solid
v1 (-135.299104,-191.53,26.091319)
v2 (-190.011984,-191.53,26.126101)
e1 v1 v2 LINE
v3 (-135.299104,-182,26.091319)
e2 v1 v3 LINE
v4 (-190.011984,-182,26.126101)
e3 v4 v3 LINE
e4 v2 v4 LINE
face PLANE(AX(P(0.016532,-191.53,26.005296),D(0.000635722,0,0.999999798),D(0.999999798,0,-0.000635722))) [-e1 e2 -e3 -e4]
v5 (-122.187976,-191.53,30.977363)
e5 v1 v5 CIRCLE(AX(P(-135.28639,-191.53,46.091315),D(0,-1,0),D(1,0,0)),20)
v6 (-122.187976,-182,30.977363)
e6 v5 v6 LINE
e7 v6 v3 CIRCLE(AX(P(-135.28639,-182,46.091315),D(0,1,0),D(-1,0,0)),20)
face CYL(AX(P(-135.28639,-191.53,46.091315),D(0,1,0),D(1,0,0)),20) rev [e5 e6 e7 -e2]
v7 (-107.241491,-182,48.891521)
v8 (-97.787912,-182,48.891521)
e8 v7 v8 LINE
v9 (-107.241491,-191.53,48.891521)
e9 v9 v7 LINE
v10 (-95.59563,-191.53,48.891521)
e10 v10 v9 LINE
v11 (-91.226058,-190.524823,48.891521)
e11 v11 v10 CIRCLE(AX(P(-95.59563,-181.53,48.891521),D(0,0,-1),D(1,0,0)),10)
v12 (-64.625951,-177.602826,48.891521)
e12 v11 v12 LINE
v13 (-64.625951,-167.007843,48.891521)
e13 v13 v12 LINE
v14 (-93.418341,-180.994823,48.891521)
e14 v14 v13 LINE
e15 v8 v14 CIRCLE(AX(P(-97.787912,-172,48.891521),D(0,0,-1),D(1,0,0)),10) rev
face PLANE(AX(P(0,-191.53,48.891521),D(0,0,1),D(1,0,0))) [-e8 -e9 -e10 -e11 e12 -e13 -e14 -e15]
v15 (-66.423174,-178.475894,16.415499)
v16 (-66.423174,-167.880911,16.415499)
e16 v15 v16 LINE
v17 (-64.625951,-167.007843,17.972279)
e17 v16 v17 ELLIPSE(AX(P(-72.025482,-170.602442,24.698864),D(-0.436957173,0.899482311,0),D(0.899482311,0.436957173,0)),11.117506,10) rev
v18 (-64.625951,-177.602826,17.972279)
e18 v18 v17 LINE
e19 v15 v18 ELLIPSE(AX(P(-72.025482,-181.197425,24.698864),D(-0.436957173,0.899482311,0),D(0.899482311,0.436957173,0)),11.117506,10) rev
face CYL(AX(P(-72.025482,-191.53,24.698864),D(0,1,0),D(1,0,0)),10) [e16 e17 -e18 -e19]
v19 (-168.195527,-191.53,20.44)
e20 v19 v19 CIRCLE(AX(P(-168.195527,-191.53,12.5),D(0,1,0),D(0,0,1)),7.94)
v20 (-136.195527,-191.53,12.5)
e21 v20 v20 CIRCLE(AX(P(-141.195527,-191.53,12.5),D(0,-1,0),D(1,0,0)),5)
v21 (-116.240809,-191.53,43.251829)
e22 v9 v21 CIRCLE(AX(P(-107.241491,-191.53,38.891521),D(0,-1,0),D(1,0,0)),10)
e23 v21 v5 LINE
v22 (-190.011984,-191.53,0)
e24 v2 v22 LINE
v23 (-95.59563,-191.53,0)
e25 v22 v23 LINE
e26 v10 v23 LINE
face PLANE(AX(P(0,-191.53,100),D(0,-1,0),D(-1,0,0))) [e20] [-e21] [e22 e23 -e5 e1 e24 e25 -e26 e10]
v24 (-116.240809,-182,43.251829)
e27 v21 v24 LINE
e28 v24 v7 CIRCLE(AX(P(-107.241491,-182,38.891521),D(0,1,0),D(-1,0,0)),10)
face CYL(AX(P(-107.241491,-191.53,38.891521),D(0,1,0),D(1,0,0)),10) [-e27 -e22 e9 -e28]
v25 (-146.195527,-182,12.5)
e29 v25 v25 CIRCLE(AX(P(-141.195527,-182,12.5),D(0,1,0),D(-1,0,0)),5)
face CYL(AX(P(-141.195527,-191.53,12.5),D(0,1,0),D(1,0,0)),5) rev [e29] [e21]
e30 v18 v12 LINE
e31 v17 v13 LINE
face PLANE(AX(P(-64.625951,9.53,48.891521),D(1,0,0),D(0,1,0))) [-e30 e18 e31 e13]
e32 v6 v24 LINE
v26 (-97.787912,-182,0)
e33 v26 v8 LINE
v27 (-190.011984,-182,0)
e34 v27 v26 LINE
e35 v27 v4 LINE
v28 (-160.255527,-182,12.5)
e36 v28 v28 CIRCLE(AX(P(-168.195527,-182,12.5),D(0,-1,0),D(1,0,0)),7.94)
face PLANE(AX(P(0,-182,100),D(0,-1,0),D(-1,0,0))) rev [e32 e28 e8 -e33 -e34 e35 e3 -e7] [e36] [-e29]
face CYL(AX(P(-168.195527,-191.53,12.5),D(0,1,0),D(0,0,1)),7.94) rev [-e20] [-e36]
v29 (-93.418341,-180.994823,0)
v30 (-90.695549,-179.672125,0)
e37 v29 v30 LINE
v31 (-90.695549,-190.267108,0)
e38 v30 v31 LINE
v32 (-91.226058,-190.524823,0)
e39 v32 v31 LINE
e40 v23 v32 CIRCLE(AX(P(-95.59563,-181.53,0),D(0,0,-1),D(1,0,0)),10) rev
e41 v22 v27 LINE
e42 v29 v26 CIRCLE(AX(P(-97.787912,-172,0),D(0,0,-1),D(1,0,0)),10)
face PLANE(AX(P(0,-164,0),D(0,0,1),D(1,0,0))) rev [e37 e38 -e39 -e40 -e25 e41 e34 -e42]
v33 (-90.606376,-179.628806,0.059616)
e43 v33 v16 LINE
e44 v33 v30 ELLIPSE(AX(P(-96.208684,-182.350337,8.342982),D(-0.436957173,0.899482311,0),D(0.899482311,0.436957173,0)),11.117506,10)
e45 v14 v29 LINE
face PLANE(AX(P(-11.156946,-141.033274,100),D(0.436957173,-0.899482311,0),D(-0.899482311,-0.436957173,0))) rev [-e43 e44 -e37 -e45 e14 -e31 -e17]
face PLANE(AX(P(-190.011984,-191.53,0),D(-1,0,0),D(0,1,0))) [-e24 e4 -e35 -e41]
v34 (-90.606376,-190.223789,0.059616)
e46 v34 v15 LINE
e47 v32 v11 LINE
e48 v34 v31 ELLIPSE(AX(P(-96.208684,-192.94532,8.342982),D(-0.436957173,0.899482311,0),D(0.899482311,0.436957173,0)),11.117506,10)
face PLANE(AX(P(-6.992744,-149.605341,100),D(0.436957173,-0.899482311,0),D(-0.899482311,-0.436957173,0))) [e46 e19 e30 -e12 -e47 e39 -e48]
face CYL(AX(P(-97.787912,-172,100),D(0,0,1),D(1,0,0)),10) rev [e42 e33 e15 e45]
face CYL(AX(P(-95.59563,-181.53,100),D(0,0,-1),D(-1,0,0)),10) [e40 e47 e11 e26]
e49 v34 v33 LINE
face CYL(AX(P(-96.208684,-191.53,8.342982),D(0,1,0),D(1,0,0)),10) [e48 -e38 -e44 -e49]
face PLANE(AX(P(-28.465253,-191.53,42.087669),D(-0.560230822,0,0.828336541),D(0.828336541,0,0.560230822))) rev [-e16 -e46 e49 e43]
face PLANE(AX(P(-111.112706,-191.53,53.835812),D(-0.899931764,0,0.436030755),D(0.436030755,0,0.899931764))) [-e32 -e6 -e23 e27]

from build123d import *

# Parameters (mm, degrees)
SALIENTE_EXTRUIR1_DEPTH    = 100
CORTAR_EXTRUIR3_START      = -9.53
CORTAR_EXTRUIR3_DEPTH      = 27.53
CORTAR_EXTRUIR4_DEPTH      = 217.130875219
CORTAR_EXTRUIR4_DEPTH_BACK = 217.130875219
CROQUIS5_R                 = 6
CORTAR_EXTRUIR5_DEPTH      = 216.124741308
CORTAR_EXTRUIR5_DEPTH_BACK = 216.124741308
CROQUIS6_R                 = 5
SALIENTE_EXTRUIR5_START    = 15.13
CROQUIS12_R                = 8
CROQUIS12_R_2              = 6
SALIENTE_EXTRUIR5_DEPTH    = 15.13
CROQUIS14_R                = 10
CROQUIS14_R_2              = 6
SALIENTE_EXTRUIR6_DEPTH    = 14.13
REDONDEO1_R                = 10
CROQUIS15_R                = 129.913958972
CORTAR_EXTRUIR6_DEPTH      = 241.731126452
CORTAR_EXTRUIR7_DEPTH      = 241.731126452
CORTAR_EXTRUIR7_DEPTH_BACK = 241.731126452
CROQUIS16_R                = 167.818918699
CROQUIS16_W                = 152.833455663
CROQUIS16_H                = 57.32474986
CROQUIS17_R                = 7.94
CORTAR_EXTRUIR8_DEPTH      = 275.18730081


# Read off the part's stored shape, not the designer's step: Cortar-Extruir3
with BuildPart() as part:
    # Croquis1 → Saliente-Extruir1 (new body)
    with BuildSketch(Plane(origin=(0, 0, 0), x_dir=(-1, 0, 0), z_dir=(0, 0, 1))):
        Polygon((197, -18), (95.487511072, -18), (58.434265153, 0), (0, 0), (0, -9.53), (56.241982635, -9.53), (93.295228555, -27.53), (197, -27.53), align=None)
    extrude(amount=SALIENTE_EXTRUIR1_DEPTH)

    # Cortar-Extruir3 outline → Cortar-Extruir3 (cut)
    with BuildSketch(Plane.XZ.offset(-18).offset(CORTAR_EXTRUIR3_START)):
        with BuildLine():
            ThreePointArc((-55.249840127, 84.500440573), (-26.332291795, 96.782267833), (-21.152892526, 65.794500802))
            Line((-21.152892526, 65.794500802), (-64.625951049, 17.972279409))
            ThreePointArc((-64.625951049, 17.972279409), (-65.478127712, 17.140282818), (-66.423173576, 16.415498915))
            Line((-66.423173576, 16.415498915), (-90.606375863, 0.05961622))
            ThreePointArc((-90.606375863, 0.05961622), (-90.650882543, 0.029688544), (-90.695549093, 0))
            Line((-90.695549093, 0), (0, 0))
            Line((0, 0), (0, 100))
            Line((0, 100), (-197, 100))
            Line((-197, 100), (-197, 0))
            Line((-197, 0), (-190.011984345, 0))
            Line((-190.011984345, 0), (-190.011984345, 26.126101457))
            Line((-190.011984345, 26.126101457), (-135.299104154, 26.091319242))
            ThreePointArc((-135.299104154, 26.091319242), (-128.302319283, 27.350377114), (-122.187975643, 30.977363067))
            Line((-122.187975643, 30.977363067), (-116.240808663, 43.251828603))
            ThreePointArc((-116.240808663, 43.251828603), (-112.551713447, 47.365099857), (-107.241491018, 48.891521053))
            Line((-107.241491018, 48.891521053), (-89.308606426, 48.891521053))
            ThreePointArc((-89.308606426, 48.891521053), (-87.268864218, 49.101758455), (-85.31488803, 49.723630708))
            ThreePointArc((-85.31488803, 49.723630708), (-66.329070141, 63.694356674), (-55.249840127, 84.500440573))
        make_face()
    extrude(amount=CORTAR_EXTRUIR3_DEPTH, mode=Mode.SUBTRACT)

    # Croquis5 → Cortar-Extruir4 (cut, two sides: drawn at the far end of the back side and taken through both)
    with BuildSketch(Plane.XZ.offset(-CORTAR_EXTRUIR4_DEPTH_BACK)):
        with Locations(Location((-35.951954024, 79.247670643, 0), (0, 0, 270))):
            Circle(CROQUIS5_R)
    extrude(amount=CORTAR_EXTRUIR4_DEPTH + CORTAR_EXTRUIR4_DEPTH_BACK, mode=Mode.SUBTRACT)

    # Croquis6 → Cortar-Extruir5 (cut, two sides: drawn at the far end of the back side and taken through both)
    with BuildSketch(Plane.XZ.offset(-18).offset(-CORTAR_EXTRUIR5_DEPTH_BACK)):
        with Locations((-168.195527475, 12.5)):
            Circle(CROQUIS6_R)
        with Locations((-141.195527475, 12.5)):
            Circle(CROQUIS6_R)
    extrude(amount=CORTAR_EXTRUIR5_DEPTH + CORTAR_EXTRUIR5_DEPTH_BACK, mode=Mode.SUBTRACT)

    # Croquis12 → Saliente-Extruir5 (add)
    with BuildSketch(Plane.XZ.offset(SALIENTE_EXTRUIR5_START)):
        with Locations(Location((-35.951954024, 79.247670643, 0), (0, 0, 90))):
            Circle(CROQUIS12_R)
        with Locations(Location((-35.951954024, 79.247670643, 0), (0, 0, 270))):
            Circle(CROQUIS12_R_2, mode=Mode.SUBTRACT)
    extrude(amount=-SALIENTE_EXTRUIR5_DEPTH)

    # Croquis14 → Saliente-Extruir6 (add)
    with BuildSketch(Plane(origin=(0, -14.13, 0), x_dir=(-1, 0, 0), z_dir=(0, -1, 0))):
        with Locations(Location((35.951954024, -79.247670643, 0), (0, 0, 90))):
            Circle(CROQUIS14_R)
        with Locations(Location((35.951954024, -79.247670643, 0), (0, 0, 90))):
            Circle(CROQUIS14_R_2, mode=Mode.SUBTRACT)
    extrude(amount=-SALIENTE_EXTRUIR6_DEPTH)

    # Redondeo1
    redondeo1_edges = [part.edges().sort_by_distance(p)[0] for p in [
        (-95.487511072, 18, 24.445760526),
        (-58.434265153, 0, 50.31488072),
        (-93.295228555, 27.53, 24.445760526),
        (-56.241982635, 9.53, 54.230230798),
    ]]
    fillet(redondeo1_edges, radius=REDONDEO1_R)


with BuildPart() as body_2:
    # Simetría1: mirrored copy
    add(part.part.mirror(Plane(origin=(0, -82, 0), x_dir=(0, 0, 1), z_dir=(0, -1, 0))))


with BuildPart() as part_1:
    add(part.part)

    # Croquis15 → Cortar-Extruir6 (cut, through all)
    with BuildSketch(Plane(origin=(0, -82, 0), x_dir=(-1, 0, 0), z_dir=(0, -1, 0))):
        with Locations((137.546426993, -18.622395962)):
            Circle(CROQUIS15_R)
    extrude(amount=-CORTAR_EXTRUIR6_DEPTH, mode=Mode.SUBTRACT)


with BuildPart() as cortar_extruir7_tool:
    # Croquis16 → Cortar-Extruir7 (new, two sides: drawn at the far end of the back side and taken through both)
    with BuildSketch(Plane(origin=(0, -82, 0), x_dir=(-1, 0, 0), z_dir=(0, -1, 0)).offset(-CORTAR_EXTRUIR7_DEPTH_BACK)):
        with Locations((140.265045612, -47.269752677)):
            Circle(CROQUIS16_R)
        with Locations((141.042678881, -20.229146123)):
            Rectangle(CROQUIS16_W, CROQUIS16_H, mode=Mode.SUBTRACT)
    extrude(amount=CORTAR_EXTRUIR7_DEPTH + CORTAR_EXTRUIR7_DEPTH_BACK)


with BuildPart() as part_2:
    add(part_1.part)

    # Cortar-Extruir7: cut by cortar_extruir7_tool
    add(cortar_extruir7_tool.part, mode=Mode.SUBTRACT)


with BuildPart() as body_2_1:
    add(body_2.part)

    # Cortar-Extruir7: cut by cortar_extruir7_tool
    add(cortar_extruir7_tool.part, mode=Mode.SUBTRACT)

    # Croquis17 → Cortar-Extruir8 (cut, through all)
    with BuildSketch(Plane(origin=(0, 0, 0), x_dir=(1, 0, 0), z_dir=(0, 1, 0))):
        with Locations(Location((-168.195527475, -12.5, 0), (0, 0, 270))):
            Circle(CROQUIS17_R)
    extrude(amount=-CORTAR_EXTRUIR8_DEPTH, mode=Mode.SUBTRACT)


solid = body_2_1.part
